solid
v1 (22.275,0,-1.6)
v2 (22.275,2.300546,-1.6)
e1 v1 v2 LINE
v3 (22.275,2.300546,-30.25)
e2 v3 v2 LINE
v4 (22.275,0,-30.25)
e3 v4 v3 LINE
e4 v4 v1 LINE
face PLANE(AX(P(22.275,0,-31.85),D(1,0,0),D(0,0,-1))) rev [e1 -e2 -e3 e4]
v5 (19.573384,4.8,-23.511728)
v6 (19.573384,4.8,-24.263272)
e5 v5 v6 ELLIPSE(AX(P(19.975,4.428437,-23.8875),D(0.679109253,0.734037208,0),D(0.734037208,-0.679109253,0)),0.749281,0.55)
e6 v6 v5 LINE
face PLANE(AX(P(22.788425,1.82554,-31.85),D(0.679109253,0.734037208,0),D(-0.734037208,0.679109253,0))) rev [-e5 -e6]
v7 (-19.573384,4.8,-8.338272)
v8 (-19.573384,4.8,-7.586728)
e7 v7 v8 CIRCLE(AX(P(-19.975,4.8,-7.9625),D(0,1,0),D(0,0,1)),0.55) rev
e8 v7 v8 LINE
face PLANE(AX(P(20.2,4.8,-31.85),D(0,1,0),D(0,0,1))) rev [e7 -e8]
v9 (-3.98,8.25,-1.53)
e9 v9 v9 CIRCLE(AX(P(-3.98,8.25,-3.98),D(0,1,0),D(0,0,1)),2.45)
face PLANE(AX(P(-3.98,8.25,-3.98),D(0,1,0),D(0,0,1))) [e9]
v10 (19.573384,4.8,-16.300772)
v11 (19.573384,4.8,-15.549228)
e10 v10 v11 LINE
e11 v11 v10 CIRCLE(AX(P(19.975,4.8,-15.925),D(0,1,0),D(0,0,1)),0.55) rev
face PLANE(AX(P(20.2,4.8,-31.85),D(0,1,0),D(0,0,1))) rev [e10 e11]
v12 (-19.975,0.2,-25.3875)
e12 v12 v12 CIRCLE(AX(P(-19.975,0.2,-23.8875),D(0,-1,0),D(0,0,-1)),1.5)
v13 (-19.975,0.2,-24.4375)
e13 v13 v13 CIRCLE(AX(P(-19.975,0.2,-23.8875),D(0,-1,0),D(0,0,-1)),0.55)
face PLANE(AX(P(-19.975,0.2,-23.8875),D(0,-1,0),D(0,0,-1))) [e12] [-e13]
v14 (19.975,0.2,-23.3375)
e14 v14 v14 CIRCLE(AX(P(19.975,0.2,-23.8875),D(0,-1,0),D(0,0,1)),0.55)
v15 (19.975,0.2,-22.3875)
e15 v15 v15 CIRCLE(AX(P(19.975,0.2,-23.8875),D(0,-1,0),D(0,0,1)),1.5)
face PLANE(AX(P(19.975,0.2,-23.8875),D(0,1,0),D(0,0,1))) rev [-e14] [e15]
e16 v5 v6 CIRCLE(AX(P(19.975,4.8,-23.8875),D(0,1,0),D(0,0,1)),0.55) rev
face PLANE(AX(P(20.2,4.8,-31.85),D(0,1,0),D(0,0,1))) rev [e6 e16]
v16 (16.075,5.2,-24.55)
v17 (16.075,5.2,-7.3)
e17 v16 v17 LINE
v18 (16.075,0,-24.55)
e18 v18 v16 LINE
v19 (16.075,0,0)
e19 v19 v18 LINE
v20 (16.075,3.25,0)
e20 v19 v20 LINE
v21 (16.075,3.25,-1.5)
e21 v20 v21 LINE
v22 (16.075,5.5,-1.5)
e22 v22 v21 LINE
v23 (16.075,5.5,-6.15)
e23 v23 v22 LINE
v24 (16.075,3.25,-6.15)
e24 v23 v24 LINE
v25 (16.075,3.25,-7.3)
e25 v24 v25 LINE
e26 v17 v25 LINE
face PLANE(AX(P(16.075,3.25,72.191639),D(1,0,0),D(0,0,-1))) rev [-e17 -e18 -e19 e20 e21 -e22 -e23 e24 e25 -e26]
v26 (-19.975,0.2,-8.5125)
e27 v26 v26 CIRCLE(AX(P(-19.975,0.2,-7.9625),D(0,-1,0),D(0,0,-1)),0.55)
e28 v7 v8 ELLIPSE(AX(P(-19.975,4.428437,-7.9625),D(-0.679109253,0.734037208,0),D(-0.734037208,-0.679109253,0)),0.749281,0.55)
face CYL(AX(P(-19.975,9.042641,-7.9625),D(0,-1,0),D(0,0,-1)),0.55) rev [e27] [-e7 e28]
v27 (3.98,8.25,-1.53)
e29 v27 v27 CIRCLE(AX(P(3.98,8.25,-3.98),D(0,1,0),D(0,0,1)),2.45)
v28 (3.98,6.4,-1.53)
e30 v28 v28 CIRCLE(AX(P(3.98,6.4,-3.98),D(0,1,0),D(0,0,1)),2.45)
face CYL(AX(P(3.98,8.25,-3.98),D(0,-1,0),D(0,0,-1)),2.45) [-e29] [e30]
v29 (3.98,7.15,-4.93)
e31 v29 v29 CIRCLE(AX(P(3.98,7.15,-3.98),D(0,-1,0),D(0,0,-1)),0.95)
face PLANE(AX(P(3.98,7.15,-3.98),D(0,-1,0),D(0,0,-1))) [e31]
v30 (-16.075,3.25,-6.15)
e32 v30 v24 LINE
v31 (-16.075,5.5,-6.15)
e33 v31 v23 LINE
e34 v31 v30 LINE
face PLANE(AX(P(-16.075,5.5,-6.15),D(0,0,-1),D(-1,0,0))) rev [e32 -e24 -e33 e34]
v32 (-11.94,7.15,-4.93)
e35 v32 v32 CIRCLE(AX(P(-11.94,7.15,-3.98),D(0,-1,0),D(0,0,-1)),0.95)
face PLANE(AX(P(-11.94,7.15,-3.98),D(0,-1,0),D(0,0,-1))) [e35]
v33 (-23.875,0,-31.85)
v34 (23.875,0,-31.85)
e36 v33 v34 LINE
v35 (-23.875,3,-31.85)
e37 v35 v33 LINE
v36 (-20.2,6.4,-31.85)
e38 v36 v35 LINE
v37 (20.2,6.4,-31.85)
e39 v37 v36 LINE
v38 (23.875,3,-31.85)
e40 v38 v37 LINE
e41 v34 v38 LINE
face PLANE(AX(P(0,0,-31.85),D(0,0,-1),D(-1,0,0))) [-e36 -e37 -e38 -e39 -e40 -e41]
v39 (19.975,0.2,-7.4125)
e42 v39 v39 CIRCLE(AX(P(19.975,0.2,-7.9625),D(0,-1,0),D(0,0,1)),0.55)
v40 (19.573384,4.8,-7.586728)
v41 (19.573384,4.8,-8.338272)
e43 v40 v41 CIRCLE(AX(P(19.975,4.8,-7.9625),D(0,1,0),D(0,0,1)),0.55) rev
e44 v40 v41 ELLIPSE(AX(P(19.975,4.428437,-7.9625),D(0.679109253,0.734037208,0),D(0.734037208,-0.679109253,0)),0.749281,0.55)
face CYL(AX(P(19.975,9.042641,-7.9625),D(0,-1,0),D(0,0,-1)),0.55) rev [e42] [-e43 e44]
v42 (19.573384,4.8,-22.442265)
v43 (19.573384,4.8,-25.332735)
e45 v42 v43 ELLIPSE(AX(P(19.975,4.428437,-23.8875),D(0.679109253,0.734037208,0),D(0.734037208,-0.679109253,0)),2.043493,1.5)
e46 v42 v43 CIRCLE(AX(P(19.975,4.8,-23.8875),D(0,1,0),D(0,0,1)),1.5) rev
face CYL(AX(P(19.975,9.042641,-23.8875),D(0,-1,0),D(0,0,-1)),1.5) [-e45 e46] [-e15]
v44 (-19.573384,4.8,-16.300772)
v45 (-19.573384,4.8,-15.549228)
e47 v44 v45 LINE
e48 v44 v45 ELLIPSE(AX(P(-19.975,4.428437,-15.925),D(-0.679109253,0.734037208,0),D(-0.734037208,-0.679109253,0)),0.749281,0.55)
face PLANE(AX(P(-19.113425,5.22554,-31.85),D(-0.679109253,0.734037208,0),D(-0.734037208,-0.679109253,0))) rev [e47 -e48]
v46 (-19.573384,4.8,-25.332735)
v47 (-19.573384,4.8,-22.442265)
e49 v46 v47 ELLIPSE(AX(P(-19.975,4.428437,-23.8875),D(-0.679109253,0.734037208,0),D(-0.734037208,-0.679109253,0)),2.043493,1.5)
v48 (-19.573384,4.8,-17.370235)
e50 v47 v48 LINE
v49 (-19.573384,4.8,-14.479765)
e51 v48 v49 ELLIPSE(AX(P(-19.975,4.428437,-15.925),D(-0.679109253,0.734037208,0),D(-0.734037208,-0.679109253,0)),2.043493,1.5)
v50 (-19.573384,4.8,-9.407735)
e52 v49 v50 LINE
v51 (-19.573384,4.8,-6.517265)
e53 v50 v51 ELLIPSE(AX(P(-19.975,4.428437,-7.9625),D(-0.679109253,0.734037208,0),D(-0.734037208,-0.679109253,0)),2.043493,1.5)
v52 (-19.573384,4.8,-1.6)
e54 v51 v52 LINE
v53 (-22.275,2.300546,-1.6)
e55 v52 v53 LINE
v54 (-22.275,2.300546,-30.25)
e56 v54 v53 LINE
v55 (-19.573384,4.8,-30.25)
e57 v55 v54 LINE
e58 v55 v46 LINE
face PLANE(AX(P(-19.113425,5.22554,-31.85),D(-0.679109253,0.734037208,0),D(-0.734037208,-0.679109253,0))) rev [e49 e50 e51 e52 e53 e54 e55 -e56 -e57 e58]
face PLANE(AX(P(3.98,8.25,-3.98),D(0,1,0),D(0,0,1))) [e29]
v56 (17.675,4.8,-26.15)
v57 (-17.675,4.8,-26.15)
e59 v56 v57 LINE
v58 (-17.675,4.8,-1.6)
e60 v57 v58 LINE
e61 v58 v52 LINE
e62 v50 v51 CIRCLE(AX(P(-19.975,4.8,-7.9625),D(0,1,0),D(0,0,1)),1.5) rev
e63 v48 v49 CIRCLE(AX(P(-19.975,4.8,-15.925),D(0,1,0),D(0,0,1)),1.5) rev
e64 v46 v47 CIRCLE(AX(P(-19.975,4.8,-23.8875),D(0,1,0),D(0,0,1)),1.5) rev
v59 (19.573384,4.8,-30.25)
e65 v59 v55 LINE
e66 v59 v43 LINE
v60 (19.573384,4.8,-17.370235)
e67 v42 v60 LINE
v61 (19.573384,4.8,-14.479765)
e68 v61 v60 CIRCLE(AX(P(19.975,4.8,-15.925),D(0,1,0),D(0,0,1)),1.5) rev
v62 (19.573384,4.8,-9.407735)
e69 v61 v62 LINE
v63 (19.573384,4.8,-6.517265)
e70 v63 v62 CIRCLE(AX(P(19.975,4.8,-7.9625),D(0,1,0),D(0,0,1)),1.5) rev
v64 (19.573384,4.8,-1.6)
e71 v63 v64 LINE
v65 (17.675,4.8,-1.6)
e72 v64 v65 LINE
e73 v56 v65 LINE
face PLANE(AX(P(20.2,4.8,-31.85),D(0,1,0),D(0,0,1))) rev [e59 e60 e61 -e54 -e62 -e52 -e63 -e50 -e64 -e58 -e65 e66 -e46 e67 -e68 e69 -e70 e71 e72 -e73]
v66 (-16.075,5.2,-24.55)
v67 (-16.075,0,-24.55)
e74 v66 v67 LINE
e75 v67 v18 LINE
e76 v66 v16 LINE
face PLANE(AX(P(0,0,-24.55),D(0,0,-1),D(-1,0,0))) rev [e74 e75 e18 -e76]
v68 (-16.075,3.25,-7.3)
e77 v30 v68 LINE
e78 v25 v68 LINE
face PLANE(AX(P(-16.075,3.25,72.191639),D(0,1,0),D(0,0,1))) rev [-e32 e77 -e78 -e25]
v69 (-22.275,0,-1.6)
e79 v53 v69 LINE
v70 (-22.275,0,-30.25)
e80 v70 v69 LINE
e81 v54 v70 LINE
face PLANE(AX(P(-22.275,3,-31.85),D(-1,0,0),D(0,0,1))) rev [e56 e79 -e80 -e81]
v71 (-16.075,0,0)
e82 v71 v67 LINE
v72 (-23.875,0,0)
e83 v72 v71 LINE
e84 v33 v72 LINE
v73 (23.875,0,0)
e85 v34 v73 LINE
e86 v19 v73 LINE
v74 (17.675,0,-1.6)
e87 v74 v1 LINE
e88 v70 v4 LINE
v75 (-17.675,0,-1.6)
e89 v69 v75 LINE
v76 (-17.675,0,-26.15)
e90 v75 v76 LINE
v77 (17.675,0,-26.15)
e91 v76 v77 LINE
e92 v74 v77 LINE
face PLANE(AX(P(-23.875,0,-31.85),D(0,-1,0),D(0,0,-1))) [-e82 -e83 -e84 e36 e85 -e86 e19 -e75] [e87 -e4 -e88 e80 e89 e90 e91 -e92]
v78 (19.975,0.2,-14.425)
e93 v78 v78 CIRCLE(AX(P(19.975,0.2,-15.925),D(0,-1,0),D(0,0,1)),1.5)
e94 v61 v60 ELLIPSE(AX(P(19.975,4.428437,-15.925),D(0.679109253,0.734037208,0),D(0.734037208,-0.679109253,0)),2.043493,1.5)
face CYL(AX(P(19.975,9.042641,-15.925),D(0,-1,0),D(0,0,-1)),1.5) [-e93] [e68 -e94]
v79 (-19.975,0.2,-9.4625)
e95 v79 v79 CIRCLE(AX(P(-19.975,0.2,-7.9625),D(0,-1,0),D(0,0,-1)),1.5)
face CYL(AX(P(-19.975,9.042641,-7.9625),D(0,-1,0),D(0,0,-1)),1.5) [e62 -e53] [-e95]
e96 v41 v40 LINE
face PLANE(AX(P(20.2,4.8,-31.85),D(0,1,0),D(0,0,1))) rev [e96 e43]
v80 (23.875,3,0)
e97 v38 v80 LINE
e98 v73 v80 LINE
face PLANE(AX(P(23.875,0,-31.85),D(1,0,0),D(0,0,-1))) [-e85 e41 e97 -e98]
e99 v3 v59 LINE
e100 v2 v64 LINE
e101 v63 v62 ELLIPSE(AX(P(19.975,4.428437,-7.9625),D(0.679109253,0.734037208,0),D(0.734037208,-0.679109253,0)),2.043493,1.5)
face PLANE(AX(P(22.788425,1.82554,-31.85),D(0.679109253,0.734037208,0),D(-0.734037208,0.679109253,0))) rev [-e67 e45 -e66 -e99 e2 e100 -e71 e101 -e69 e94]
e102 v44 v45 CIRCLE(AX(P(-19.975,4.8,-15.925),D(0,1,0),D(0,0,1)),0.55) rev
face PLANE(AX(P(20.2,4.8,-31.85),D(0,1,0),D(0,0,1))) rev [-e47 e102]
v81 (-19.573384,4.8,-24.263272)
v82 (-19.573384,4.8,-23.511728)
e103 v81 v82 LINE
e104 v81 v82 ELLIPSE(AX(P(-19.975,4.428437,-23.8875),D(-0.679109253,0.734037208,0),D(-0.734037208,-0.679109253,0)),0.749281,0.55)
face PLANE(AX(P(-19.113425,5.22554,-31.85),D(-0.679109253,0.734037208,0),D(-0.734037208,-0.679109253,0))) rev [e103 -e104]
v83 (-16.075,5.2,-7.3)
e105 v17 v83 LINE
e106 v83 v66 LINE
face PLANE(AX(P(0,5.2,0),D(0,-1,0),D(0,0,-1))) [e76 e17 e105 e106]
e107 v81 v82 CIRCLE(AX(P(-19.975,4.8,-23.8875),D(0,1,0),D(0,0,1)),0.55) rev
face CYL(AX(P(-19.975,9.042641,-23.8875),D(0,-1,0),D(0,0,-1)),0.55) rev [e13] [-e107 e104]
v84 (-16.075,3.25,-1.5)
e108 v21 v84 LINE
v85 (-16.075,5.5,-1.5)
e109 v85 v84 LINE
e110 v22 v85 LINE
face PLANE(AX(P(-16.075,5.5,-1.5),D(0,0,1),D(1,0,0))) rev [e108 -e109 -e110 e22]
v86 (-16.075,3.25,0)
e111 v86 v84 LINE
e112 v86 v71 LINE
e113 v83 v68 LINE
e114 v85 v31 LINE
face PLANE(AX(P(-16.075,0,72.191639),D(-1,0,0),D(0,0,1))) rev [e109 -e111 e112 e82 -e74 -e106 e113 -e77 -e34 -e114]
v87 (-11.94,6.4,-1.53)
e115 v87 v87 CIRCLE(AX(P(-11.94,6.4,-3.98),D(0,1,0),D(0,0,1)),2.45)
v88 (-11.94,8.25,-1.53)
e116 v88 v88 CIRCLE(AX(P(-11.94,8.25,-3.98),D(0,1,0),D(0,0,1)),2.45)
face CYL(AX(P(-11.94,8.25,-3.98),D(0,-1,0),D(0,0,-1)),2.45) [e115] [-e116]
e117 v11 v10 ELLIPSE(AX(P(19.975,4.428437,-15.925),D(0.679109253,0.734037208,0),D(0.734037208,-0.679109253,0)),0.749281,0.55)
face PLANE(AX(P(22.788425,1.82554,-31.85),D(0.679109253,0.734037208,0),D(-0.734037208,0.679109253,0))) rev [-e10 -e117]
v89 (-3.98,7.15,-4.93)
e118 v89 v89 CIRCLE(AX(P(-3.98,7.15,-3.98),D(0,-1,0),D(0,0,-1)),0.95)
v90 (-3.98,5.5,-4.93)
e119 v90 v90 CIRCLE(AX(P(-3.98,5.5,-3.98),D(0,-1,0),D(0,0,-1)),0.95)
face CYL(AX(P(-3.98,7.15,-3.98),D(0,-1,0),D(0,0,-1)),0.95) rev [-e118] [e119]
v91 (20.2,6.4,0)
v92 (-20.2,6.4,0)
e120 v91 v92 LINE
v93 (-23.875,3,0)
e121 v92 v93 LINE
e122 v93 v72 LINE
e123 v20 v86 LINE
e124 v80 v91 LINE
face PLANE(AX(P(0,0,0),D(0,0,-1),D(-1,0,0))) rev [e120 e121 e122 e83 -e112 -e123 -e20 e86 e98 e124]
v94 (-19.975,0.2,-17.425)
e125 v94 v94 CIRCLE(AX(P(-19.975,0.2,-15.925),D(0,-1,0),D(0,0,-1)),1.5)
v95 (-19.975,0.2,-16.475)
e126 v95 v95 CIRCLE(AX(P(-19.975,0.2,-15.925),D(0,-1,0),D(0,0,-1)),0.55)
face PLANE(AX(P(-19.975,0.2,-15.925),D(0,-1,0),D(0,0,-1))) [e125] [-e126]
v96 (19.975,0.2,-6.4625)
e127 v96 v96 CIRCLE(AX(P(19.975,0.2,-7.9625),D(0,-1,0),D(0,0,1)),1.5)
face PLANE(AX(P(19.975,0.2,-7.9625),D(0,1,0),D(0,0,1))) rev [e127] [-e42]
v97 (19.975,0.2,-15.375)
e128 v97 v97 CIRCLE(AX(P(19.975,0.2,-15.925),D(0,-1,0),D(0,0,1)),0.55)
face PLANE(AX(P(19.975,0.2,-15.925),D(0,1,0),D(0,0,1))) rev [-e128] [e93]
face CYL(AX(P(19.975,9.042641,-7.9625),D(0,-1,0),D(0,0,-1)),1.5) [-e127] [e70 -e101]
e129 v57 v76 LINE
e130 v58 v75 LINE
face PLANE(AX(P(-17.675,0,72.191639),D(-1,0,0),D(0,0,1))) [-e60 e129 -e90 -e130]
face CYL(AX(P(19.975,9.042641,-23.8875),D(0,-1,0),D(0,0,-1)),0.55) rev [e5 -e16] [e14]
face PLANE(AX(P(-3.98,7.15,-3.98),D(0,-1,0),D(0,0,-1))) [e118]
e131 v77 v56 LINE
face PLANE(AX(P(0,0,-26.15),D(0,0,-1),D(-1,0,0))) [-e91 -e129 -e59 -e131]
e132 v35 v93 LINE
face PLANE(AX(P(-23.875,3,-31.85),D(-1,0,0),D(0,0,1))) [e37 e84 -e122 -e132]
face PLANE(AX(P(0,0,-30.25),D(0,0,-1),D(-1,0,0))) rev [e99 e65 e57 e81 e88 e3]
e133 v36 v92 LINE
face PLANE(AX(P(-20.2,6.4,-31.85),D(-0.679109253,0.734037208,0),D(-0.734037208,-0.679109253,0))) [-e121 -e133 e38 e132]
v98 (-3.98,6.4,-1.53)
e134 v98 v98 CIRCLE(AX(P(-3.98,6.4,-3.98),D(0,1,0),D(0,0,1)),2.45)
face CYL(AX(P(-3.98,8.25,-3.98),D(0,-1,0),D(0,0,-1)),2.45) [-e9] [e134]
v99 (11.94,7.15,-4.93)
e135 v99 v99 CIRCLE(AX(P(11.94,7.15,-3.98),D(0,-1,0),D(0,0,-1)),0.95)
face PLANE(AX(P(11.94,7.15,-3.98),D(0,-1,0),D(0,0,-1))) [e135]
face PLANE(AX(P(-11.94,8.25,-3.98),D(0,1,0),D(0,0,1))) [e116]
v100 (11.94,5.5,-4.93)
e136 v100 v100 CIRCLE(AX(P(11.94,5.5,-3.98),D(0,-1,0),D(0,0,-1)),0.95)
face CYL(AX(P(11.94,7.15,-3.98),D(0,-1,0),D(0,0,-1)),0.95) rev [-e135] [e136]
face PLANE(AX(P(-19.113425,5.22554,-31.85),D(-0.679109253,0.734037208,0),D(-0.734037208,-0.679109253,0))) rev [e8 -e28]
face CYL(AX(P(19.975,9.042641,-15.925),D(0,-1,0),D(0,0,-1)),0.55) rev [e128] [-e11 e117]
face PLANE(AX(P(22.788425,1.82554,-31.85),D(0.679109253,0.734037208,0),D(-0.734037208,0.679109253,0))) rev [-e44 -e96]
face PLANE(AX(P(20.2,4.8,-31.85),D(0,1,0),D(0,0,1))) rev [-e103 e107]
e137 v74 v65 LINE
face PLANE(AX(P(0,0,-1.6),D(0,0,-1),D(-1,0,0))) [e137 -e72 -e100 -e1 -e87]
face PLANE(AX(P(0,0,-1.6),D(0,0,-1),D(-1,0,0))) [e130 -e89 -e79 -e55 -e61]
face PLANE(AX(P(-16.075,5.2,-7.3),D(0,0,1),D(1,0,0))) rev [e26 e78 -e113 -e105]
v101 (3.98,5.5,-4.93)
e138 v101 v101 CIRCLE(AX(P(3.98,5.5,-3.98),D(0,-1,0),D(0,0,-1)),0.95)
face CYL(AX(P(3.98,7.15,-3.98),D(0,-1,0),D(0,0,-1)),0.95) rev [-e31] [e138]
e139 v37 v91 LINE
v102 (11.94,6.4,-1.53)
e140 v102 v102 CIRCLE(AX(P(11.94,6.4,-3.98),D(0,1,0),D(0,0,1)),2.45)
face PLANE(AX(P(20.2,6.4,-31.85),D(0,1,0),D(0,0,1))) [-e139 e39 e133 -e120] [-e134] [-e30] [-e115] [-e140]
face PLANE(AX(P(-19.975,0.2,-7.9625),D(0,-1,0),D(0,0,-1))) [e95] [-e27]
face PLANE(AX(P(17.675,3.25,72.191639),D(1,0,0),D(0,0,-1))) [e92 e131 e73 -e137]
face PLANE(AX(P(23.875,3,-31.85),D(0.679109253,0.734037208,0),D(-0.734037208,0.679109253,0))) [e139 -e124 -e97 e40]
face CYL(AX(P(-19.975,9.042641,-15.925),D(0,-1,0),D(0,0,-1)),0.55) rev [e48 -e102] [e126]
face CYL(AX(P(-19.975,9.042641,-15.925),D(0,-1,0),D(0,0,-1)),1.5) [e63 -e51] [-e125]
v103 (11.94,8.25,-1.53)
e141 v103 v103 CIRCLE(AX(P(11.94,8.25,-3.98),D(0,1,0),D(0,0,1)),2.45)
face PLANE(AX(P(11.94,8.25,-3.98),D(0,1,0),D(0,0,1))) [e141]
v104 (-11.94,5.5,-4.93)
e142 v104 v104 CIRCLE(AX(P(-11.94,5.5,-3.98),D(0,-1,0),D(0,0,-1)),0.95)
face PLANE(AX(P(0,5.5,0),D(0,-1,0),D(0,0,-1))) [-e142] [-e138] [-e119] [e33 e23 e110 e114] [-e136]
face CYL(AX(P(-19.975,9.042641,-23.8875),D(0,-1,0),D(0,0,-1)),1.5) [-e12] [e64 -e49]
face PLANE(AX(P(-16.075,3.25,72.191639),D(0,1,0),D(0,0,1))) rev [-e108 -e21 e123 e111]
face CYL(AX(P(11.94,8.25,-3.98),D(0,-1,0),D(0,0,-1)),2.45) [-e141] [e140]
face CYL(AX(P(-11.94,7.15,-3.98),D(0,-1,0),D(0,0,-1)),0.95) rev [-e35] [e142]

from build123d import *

# Parameters (mm, degrees)
BOSS_EXTRUDE1_DEPTH     = 31.85
CUT_EXTRUDE1_DEPTH      = 41.316226572
CUT_EXTRUDE1_DEPTH_BACK = 24.55
SHELL1_START            = -30.25
SHELL1_DEPTH            = 28.65
SHELL1_2_OUTLINE_W      = 35.35
SHELL1_2_OUTLINE_H      = 4.8
SHELL1_2_DEPTH          = 4.1
BOSS_EXTRUDE2_START     = -4.6
SKETCH3_R               = 1.5
SKETCH3_R_2             = 0.55
BOSS_EXTRUDE2_DEPTH     = 4.6
SKETCH4_W               = 32.15
SKETCH4_H               = 17.25
CUT_EXTRUDE2_DEPTH      = 1.95
SKETCH5_W               = 32.15
SKETCH5_H               = 4.65
CUT_EXTRUDE3_DEPTH      = 2.25
SKETCH6_R               = 2.45
BOSS_EXTRUDE3_DEPTH     = 1.85
SKETCH7_R               = 0.95
CUT_EXTRUDE4_DEPTH      = 1.65


# Read off the part's stored shape, not the designer's step: Shell1
with BuildPart() as part:
    # Sketch1 → Boss-Extrude1 (new body)
    with BuildSketch(Plane.XY):
        Polygon((23.875, 0), (23.875, 3), (20.2, 6.4), (-20.2, 6.4), (-23.875, 3), (-23.875, 0), align=None)
    extrude(amount=-BOSS_EXTRUDE1_DEPTH)

    # Sketch2 → Cut-Extrude1 (cut, two sides: drawn at the far end of the back side and taken through both)
    with BuildSketch(Plane.XY.offset(-CUT_EXTRUDE1_DEPTH_BACK)):
        Polygon((-16.075, -90.918786447), (-16.075, 0), (-16.075, 3.25), (16.075, 3.25), (16.075, 0), (16.075, -90.918786447), (16.075, -272.75635934), (-16.075, -272.75635934), align=None)
    extrude(amount=CUT_EXTRUDE1_DEPTH + CUT_EXTRUDE1_DEPTH_BACK, mode=Mode.SUBTRACT)

    # Shell1 outline → Shell1 (cut)
    with BuildSketch(Plane.XY.offset(SHELL1_START)):
        Polygon((22.275, 2.30054609), (19.573384377, 4.8), (17.675, 4.8), (17.675, 0), (22.275, 0), align=None)
        Polygon((-17.675, 0), (-17.675, 4.8), (-19.573384377, 4.8), (-22.275, 2.30054609), (-22.275, 0), align=None)
    extrude(amount=SHELL1_DEPTH, mode=Mode.SUBTRACT)

    # Shell1 2 outline → Shell1 2 (cut)
    with BuildSketch(Plane.XY.offset(SHELL1_START)):
        with Locations((0, 2.4)):
            Rectangle(SHELL1_2_OUTLINE_W, SHELL1_2_OUTLINE_H)
    extrude(amount=SHELL1_2_DEPTH, mode=Mode.SUBTRACT)

    # Sketch3 → Boss-Extrude2 (add)
    # profile 1 of 6: a face of its own
    with BuildSketch(Plane(origin=(0, 0.2, 0), x_dir=(-1, 0, 0), z_dir=(0, -1, 0)).offset(BOSS_EXTRUDE2_START)):
        with Locations(Location((19.975, 7.9625, 0), (0, 0, 90))):
            Circle(SKETCH3_R)
        with Locations(Location((19.975, 7.9625, 0), (0, 0, 90))):
            Circle(SKETCH3_R_2, mode=Mode.SUBTRACT)
    # profile 2 of 6: a face of its own
    with BuildSketch(Plane(origin=(0, 0.2, 0), x_dir=(-1, 0, 0), z_dir=(0, -1, 0)).offset(BOSS_EXTRUDE2_START)):
        with Locations(Location((19.975, 15.925, 0), (0, 0, 90))):
            Circle(SKETCH3_R)
        with Locations(Location((19.975, 15.925, 0), (0, 0, 90))):
            Circle(SKETCH3_R_2, mode=Mode.SUBTRACT)
    # profile 3 of 6: a face of its own
    with BuildSketch(Plane(origin=(0, 0.2, 0), x_dir=(-1, 0, 0), z_dir=(0, -1, 0)).offset(BOSS_EXTRUDE2_START)):
        with Locations(Location((19.975, 23.8875, 0), (0, 0, 90))):
            Circle(SKETCH3_R)
        with Locations(Location((19.975, 23.8875, 0), (0, 0, 90))):
            Circle(SKETCH3_R_2, mode=Mode.SUBTRACT)
    # profile 4 of 6: a face of its own
    with BuildSketch(Plane(origin=(0, 0.2, 0), x_dir=(-1, 0, 0), z_dir=(0, -1, 0)).offset(BOSS_EXTRUDE2_START)):
        with Locations(Location((-19.975, 23.8875, 0), (0, 0, 74.469949242))):
            Circle(SKETCH3_R)
        with Locations(Location((-19.975, 23.8875, 0), (0, 0, 43.095979253))):
            Circle(SKETCH3_R_2, mode=Mode.SUBTRACT)
    # profile 5 of 6: a face of its own
    with BuildSketch(Plane(origin=(0, 0.2, 0), x_dir=(-1, 0, 0), z_dir=(0, -1, 0)).offset(BOSS_EXTRUDE2_START)):
        with Locations(Location((-19.975, 15.925, 0), (0, 0, 74.469949242))):
            Circle(SKETCH3_R)
        with Locations(Location((-19.975, 15.925, 0), (0, 0, 43.095979253))):
            Circle(SKETCH3_R_2, mode=Mode.SUBTRACT)
    # profile 6 of 6: a face of its own
    with BuildSketch(Plane(origin=(0, 0.2, 0), x_dir=(-1, 0, 0), z_dir=(0, -1, 0)).offset(BOSS_EXTRUDE2_START)):
        with Locations(Location((-19.975, 7.9625, 0), (0, 0, 74.469949242))):
            Circle(SKETCH3_R)
        with Locations(Location((-19.975, 7.9625, 0), (0, 0, 43.095979253))):
            Circle(SKETCH3_R_2, mode=Mode.SUBTRACT)
    extrude(amount=BOSS_EXTRUDE2_DEPTH)

    # Sketch4 → Cut-Extrude2 (cut)
    with BuildSketch(Plane.XZ.offset(-3.25)):
        with Locations((0, -15.925)):
            Rectangle(SKETCH4_W, SKETCH4_H)
    extrude(amount=-CUT_EXTRUDE2_DEPTH, mode=Mode.SUBTRACT)

    # Sketch5 → Cut-Extrude3 (cut)
    with BuildSketch(Plane.XZ.offset(-3.25)):
        with Locations((0, -3.825)):
            Rectangle(SKETCH5_W, SKETCH5_H)
    extrude(amount=-CUT_EXTRUDE3_DEPTH, mode=Mode.SUBTRACT)

    # Sketch6 → Boss-Extrude3 (add)
    with BuildSketch(Plane(origin=(0, 6.4, 0), x_dir=(1, 0, 0), z_dir=(0, 1, 0))):
        with Locations(Location((-3.98, 3.98, 0), (0, 0, 270))):
            Circle(SKETCH6_R)
        with Locations(Location((3.98, 3.98, 0), (0, 0, 270))):
            Circle(SKETCH6_R)
        with Locations(Location((-11.94, 3.98, 0), (0, 0, 270))):
            Circle(SKETCH6_R)
        with Locations(Location((11.94, 3.98, 0), (0, 0, 270))):
            Circle(SKETCH6_R)
    extrude(amount=BOSS_EXTRUDE3_DEPTH)

    # Sketch7 → Cut-Extrude4 (cut)
    with BuildSketch(Plane.XZ.offset(-5.5)):
        with Locations(Location((-11.94, -3.98, 0), (0, 0, 270))):
            Circle(SKETCH7_R)
        with Locations(Location((-3.98, -3.98, 0), (0, 0, 270))):
            Circle(SKETCH7_R)
        with Locations(Location((3.98, -3.98, 0), (0, 0, 270))):
            Circle(SKETCH7_R)
        with Locations(Location((11.94, -3.98, 0), (0, 0, 270))):
            Circle(SKETCH7_R)
    extrude(amount=-CUT_EXTRUDE4_DEPTH, mode=Mode.SUBTRACT)


solid = part.part
